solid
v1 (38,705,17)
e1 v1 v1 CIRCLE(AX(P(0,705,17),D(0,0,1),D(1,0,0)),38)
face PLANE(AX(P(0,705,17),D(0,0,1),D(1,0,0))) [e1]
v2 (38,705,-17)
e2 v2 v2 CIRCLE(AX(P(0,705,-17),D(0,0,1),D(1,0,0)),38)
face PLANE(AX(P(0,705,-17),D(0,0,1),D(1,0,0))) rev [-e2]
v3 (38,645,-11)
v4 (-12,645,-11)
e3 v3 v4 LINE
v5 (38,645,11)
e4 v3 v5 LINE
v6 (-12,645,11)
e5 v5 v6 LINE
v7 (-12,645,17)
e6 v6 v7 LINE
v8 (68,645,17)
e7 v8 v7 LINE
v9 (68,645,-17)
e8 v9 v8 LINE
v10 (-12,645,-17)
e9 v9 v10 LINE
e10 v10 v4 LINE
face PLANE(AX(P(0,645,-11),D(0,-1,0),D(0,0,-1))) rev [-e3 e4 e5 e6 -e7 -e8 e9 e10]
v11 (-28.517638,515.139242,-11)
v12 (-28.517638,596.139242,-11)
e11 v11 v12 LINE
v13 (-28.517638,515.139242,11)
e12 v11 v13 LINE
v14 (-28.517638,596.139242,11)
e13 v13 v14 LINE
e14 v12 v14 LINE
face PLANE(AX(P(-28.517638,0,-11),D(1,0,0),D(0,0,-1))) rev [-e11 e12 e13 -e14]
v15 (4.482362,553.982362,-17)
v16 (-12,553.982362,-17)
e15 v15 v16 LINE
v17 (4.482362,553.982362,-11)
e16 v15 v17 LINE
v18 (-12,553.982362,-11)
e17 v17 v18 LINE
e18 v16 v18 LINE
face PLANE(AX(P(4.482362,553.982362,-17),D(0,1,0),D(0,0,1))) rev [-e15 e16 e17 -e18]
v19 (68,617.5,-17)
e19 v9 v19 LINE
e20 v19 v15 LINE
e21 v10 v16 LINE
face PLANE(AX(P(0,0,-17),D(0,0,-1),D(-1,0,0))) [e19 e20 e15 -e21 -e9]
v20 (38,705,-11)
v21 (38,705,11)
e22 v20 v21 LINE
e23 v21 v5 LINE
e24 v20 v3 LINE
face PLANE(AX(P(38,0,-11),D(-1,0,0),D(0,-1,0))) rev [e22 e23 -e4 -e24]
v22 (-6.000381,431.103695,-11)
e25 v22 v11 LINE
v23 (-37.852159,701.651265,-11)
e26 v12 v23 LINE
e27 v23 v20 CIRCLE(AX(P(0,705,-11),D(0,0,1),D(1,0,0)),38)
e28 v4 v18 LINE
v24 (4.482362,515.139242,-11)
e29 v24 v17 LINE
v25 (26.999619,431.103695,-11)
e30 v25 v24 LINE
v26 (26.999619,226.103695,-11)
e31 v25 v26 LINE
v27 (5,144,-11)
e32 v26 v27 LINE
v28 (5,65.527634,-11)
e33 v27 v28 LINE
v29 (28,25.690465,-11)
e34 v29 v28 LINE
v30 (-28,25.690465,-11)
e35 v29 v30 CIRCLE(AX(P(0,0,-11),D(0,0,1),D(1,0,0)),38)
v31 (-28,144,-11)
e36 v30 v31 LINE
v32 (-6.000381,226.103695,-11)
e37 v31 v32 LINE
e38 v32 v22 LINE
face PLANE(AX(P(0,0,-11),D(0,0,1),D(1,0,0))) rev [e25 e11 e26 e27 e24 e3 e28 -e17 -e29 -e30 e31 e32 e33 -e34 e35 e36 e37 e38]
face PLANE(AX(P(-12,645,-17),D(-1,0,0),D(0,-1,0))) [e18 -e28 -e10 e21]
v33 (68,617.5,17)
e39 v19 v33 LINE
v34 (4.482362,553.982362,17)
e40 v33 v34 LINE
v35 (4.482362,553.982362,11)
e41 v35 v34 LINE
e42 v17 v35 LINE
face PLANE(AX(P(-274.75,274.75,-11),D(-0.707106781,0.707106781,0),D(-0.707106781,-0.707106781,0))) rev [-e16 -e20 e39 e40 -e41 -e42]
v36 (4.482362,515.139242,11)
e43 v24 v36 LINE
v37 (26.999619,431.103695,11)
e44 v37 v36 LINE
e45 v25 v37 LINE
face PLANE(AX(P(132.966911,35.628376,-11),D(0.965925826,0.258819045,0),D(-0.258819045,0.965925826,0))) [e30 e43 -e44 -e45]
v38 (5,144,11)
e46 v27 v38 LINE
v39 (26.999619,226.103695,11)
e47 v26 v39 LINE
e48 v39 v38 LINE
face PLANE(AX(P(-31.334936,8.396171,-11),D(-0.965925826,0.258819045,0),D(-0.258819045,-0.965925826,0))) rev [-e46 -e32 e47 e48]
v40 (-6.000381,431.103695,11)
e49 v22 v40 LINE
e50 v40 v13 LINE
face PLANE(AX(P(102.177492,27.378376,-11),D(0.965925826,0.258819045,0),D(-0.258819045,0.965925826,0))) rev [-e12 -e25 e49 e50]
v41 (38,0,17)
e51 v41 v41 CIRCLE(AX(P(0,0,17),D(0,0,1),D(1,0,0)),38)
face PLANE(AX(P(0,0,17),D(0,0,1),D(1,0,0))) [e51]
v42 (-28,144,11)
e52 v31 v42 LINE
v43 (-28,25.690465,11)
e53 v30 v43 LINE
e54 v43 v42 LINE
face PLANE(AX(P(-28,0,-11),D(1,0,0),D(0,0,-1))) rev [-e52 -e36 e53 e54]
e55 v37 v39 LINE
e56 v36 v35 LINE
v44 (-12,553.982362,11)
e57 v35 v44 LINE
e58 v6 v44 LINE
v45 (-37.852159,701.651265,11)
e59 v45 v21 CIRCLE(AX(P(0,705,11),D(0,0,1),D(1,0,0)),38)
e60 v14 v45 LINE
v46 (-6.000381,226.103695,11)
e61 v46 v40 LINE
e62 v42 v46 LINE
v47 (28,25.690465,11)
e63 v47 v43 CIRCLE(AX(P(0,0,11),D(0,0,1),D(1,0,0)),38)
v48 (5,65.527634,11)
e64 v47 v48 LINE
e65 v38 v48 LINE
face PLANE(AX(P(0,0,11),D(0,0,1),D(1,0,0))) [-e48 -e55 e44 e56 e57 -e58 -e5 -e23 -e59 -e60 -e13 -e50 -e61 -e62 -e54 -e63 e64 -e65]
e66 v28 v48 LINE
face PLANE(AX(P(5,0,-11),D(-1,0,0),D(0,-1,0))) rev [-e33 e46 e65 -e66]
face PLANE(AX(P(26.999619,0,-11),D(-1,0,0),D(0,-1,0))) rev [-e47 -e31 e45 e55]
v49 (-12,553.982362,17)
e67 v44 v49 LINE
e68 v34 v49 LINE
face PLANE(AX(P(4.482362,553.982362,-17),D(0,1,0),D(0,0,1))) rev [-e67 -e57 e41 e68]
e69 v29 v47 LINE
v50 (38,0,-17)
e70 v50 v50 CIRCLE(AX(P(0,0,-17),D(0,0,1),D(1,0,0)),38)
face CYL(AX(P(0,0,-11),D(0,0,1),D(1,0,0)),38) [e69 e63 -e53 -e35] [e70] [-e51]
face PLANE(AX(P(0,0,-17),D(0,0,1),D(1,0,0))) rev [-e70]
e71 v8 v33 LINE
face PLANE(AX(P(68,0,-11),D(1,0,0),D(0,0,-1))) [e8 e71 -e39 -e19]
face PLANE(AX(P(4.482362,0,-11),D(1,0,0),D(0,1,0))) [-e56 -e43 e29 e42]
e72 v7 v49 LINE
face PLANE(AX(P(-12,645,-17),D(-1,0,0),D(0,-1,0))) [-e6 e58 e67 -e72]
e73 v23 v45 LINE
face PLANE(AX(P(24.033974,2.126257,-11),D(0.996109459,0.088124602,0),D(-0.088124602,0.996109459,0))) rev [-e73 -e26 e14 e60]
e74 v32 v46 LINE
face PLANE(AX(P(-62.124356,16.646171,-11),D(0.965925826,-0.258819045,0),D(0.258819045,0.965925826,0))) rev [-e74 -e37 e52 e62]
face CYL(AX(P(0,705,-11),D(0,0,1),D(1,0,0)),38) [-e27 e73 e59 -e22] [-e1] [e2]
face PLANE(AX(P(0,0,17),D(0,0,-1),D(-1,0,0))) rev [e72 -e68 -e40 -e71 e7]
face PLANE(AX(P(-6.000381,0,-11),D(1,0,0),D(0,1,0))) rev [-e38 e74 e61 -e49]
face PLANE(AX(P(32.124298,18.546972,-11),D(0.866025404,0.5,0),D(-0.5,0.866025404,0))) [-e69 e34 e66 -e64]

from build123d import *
from build123d.topology import SkipClean

# Parameters (mm, degrees)
BOSS_EXTRUDE1_DEPTH      = 11
BOSS_EXTRUDE1_DEPTH_BACK = 11
BOSS_EXTRUDE2_DEPTH      = 17
BOSS_EXTRUDE2_DEPTH_BACK = 17
SKETCH3_R                = 38


with BuildPart() as part:
    # Sketch1 → Boss-Extrude1 (new, two sides: drawn at the far end of the back side and taken through both)
    with BuildSketch(Plane.XY.offset(-BOSS_EXTRUDE1_DEPTH_BACK)):
        with BuildLine():
            Line((-28, 144), (-28, 25.690465157))
            ThreePointArc((-28, 25.690465157), (0, -38), (28, 25.690465157))
            Line((28, 25.690465157), (5, 65.527633731))
            Line((5, 65.527633731), (5, 144))
            Line((5, 144), (26.999618834, 226.103695235))
            Line((26.999618834, 226.103695235), (26.999618834, 431.103695235))
            Line((26.999618834, 431.103695235), (4.48236191, 515.139242122))
            Line((4.48236191, 515.139242122), (4.48236191, 553.98236191))
            Line((4.48236191, 553.98236191), (68, 617.5))
            Line((68, 617.5), (68, 645))
            Line((68, 645), (38, 645))
            Line((38, 645), (38, 705))
            ThreePointArc((38, 705), (-1.675998364, 742.96302187), (-37.852159447, 701.651265129))
            Line((-37.852159447, 701.651265129), (-28.51763809, 596.139242122))
            Line((-28.51763809, 596.139242122), (-28.51763809, 515.139242122))
            Line((-28.51763809, 515.139242122), (-6.000381166, 431.103695235))
            Line((-6.000381166, 431.103695235), (-6.000381166, 226.103695235))
            Line((-6.000381166, 226.103695235), (-28, 144))
        make_face()
    extrude(amount=BOSS_EXTRUDE1_DEPTH + BOSS_EXTRUDE1_DEPTH_BACK)

    # Sketch3 → Boss-Extrude2 (add, two sides: drawn at the far end of the back side and taken through both)
    with SkipClean():  # the faces are left unmerged after this step: merging them gives an invalid solid
        with BuildSketch(Plane.XY.offset(-BOSS_EXTRUDE2_DEPTH_BACK)):
            with Locations((0, 705)):
                Circle(SKETCH3_R)
            Circle(SKETCH3_R)
            Polygon((68, 617.5), (4.48236191, 553.98236191), (-12, 553.98236191), (-12, 645), (68, 645), align=None)
        extrude(amount=BOSS_EXTRUDE2_DEPTH + BOSS_EXTRUDE2_DEPTH_BACK)
    add(part.part.scale(1), mode=Mode.REPLACE)  # the faces are merged on a copy


solid = part.part
